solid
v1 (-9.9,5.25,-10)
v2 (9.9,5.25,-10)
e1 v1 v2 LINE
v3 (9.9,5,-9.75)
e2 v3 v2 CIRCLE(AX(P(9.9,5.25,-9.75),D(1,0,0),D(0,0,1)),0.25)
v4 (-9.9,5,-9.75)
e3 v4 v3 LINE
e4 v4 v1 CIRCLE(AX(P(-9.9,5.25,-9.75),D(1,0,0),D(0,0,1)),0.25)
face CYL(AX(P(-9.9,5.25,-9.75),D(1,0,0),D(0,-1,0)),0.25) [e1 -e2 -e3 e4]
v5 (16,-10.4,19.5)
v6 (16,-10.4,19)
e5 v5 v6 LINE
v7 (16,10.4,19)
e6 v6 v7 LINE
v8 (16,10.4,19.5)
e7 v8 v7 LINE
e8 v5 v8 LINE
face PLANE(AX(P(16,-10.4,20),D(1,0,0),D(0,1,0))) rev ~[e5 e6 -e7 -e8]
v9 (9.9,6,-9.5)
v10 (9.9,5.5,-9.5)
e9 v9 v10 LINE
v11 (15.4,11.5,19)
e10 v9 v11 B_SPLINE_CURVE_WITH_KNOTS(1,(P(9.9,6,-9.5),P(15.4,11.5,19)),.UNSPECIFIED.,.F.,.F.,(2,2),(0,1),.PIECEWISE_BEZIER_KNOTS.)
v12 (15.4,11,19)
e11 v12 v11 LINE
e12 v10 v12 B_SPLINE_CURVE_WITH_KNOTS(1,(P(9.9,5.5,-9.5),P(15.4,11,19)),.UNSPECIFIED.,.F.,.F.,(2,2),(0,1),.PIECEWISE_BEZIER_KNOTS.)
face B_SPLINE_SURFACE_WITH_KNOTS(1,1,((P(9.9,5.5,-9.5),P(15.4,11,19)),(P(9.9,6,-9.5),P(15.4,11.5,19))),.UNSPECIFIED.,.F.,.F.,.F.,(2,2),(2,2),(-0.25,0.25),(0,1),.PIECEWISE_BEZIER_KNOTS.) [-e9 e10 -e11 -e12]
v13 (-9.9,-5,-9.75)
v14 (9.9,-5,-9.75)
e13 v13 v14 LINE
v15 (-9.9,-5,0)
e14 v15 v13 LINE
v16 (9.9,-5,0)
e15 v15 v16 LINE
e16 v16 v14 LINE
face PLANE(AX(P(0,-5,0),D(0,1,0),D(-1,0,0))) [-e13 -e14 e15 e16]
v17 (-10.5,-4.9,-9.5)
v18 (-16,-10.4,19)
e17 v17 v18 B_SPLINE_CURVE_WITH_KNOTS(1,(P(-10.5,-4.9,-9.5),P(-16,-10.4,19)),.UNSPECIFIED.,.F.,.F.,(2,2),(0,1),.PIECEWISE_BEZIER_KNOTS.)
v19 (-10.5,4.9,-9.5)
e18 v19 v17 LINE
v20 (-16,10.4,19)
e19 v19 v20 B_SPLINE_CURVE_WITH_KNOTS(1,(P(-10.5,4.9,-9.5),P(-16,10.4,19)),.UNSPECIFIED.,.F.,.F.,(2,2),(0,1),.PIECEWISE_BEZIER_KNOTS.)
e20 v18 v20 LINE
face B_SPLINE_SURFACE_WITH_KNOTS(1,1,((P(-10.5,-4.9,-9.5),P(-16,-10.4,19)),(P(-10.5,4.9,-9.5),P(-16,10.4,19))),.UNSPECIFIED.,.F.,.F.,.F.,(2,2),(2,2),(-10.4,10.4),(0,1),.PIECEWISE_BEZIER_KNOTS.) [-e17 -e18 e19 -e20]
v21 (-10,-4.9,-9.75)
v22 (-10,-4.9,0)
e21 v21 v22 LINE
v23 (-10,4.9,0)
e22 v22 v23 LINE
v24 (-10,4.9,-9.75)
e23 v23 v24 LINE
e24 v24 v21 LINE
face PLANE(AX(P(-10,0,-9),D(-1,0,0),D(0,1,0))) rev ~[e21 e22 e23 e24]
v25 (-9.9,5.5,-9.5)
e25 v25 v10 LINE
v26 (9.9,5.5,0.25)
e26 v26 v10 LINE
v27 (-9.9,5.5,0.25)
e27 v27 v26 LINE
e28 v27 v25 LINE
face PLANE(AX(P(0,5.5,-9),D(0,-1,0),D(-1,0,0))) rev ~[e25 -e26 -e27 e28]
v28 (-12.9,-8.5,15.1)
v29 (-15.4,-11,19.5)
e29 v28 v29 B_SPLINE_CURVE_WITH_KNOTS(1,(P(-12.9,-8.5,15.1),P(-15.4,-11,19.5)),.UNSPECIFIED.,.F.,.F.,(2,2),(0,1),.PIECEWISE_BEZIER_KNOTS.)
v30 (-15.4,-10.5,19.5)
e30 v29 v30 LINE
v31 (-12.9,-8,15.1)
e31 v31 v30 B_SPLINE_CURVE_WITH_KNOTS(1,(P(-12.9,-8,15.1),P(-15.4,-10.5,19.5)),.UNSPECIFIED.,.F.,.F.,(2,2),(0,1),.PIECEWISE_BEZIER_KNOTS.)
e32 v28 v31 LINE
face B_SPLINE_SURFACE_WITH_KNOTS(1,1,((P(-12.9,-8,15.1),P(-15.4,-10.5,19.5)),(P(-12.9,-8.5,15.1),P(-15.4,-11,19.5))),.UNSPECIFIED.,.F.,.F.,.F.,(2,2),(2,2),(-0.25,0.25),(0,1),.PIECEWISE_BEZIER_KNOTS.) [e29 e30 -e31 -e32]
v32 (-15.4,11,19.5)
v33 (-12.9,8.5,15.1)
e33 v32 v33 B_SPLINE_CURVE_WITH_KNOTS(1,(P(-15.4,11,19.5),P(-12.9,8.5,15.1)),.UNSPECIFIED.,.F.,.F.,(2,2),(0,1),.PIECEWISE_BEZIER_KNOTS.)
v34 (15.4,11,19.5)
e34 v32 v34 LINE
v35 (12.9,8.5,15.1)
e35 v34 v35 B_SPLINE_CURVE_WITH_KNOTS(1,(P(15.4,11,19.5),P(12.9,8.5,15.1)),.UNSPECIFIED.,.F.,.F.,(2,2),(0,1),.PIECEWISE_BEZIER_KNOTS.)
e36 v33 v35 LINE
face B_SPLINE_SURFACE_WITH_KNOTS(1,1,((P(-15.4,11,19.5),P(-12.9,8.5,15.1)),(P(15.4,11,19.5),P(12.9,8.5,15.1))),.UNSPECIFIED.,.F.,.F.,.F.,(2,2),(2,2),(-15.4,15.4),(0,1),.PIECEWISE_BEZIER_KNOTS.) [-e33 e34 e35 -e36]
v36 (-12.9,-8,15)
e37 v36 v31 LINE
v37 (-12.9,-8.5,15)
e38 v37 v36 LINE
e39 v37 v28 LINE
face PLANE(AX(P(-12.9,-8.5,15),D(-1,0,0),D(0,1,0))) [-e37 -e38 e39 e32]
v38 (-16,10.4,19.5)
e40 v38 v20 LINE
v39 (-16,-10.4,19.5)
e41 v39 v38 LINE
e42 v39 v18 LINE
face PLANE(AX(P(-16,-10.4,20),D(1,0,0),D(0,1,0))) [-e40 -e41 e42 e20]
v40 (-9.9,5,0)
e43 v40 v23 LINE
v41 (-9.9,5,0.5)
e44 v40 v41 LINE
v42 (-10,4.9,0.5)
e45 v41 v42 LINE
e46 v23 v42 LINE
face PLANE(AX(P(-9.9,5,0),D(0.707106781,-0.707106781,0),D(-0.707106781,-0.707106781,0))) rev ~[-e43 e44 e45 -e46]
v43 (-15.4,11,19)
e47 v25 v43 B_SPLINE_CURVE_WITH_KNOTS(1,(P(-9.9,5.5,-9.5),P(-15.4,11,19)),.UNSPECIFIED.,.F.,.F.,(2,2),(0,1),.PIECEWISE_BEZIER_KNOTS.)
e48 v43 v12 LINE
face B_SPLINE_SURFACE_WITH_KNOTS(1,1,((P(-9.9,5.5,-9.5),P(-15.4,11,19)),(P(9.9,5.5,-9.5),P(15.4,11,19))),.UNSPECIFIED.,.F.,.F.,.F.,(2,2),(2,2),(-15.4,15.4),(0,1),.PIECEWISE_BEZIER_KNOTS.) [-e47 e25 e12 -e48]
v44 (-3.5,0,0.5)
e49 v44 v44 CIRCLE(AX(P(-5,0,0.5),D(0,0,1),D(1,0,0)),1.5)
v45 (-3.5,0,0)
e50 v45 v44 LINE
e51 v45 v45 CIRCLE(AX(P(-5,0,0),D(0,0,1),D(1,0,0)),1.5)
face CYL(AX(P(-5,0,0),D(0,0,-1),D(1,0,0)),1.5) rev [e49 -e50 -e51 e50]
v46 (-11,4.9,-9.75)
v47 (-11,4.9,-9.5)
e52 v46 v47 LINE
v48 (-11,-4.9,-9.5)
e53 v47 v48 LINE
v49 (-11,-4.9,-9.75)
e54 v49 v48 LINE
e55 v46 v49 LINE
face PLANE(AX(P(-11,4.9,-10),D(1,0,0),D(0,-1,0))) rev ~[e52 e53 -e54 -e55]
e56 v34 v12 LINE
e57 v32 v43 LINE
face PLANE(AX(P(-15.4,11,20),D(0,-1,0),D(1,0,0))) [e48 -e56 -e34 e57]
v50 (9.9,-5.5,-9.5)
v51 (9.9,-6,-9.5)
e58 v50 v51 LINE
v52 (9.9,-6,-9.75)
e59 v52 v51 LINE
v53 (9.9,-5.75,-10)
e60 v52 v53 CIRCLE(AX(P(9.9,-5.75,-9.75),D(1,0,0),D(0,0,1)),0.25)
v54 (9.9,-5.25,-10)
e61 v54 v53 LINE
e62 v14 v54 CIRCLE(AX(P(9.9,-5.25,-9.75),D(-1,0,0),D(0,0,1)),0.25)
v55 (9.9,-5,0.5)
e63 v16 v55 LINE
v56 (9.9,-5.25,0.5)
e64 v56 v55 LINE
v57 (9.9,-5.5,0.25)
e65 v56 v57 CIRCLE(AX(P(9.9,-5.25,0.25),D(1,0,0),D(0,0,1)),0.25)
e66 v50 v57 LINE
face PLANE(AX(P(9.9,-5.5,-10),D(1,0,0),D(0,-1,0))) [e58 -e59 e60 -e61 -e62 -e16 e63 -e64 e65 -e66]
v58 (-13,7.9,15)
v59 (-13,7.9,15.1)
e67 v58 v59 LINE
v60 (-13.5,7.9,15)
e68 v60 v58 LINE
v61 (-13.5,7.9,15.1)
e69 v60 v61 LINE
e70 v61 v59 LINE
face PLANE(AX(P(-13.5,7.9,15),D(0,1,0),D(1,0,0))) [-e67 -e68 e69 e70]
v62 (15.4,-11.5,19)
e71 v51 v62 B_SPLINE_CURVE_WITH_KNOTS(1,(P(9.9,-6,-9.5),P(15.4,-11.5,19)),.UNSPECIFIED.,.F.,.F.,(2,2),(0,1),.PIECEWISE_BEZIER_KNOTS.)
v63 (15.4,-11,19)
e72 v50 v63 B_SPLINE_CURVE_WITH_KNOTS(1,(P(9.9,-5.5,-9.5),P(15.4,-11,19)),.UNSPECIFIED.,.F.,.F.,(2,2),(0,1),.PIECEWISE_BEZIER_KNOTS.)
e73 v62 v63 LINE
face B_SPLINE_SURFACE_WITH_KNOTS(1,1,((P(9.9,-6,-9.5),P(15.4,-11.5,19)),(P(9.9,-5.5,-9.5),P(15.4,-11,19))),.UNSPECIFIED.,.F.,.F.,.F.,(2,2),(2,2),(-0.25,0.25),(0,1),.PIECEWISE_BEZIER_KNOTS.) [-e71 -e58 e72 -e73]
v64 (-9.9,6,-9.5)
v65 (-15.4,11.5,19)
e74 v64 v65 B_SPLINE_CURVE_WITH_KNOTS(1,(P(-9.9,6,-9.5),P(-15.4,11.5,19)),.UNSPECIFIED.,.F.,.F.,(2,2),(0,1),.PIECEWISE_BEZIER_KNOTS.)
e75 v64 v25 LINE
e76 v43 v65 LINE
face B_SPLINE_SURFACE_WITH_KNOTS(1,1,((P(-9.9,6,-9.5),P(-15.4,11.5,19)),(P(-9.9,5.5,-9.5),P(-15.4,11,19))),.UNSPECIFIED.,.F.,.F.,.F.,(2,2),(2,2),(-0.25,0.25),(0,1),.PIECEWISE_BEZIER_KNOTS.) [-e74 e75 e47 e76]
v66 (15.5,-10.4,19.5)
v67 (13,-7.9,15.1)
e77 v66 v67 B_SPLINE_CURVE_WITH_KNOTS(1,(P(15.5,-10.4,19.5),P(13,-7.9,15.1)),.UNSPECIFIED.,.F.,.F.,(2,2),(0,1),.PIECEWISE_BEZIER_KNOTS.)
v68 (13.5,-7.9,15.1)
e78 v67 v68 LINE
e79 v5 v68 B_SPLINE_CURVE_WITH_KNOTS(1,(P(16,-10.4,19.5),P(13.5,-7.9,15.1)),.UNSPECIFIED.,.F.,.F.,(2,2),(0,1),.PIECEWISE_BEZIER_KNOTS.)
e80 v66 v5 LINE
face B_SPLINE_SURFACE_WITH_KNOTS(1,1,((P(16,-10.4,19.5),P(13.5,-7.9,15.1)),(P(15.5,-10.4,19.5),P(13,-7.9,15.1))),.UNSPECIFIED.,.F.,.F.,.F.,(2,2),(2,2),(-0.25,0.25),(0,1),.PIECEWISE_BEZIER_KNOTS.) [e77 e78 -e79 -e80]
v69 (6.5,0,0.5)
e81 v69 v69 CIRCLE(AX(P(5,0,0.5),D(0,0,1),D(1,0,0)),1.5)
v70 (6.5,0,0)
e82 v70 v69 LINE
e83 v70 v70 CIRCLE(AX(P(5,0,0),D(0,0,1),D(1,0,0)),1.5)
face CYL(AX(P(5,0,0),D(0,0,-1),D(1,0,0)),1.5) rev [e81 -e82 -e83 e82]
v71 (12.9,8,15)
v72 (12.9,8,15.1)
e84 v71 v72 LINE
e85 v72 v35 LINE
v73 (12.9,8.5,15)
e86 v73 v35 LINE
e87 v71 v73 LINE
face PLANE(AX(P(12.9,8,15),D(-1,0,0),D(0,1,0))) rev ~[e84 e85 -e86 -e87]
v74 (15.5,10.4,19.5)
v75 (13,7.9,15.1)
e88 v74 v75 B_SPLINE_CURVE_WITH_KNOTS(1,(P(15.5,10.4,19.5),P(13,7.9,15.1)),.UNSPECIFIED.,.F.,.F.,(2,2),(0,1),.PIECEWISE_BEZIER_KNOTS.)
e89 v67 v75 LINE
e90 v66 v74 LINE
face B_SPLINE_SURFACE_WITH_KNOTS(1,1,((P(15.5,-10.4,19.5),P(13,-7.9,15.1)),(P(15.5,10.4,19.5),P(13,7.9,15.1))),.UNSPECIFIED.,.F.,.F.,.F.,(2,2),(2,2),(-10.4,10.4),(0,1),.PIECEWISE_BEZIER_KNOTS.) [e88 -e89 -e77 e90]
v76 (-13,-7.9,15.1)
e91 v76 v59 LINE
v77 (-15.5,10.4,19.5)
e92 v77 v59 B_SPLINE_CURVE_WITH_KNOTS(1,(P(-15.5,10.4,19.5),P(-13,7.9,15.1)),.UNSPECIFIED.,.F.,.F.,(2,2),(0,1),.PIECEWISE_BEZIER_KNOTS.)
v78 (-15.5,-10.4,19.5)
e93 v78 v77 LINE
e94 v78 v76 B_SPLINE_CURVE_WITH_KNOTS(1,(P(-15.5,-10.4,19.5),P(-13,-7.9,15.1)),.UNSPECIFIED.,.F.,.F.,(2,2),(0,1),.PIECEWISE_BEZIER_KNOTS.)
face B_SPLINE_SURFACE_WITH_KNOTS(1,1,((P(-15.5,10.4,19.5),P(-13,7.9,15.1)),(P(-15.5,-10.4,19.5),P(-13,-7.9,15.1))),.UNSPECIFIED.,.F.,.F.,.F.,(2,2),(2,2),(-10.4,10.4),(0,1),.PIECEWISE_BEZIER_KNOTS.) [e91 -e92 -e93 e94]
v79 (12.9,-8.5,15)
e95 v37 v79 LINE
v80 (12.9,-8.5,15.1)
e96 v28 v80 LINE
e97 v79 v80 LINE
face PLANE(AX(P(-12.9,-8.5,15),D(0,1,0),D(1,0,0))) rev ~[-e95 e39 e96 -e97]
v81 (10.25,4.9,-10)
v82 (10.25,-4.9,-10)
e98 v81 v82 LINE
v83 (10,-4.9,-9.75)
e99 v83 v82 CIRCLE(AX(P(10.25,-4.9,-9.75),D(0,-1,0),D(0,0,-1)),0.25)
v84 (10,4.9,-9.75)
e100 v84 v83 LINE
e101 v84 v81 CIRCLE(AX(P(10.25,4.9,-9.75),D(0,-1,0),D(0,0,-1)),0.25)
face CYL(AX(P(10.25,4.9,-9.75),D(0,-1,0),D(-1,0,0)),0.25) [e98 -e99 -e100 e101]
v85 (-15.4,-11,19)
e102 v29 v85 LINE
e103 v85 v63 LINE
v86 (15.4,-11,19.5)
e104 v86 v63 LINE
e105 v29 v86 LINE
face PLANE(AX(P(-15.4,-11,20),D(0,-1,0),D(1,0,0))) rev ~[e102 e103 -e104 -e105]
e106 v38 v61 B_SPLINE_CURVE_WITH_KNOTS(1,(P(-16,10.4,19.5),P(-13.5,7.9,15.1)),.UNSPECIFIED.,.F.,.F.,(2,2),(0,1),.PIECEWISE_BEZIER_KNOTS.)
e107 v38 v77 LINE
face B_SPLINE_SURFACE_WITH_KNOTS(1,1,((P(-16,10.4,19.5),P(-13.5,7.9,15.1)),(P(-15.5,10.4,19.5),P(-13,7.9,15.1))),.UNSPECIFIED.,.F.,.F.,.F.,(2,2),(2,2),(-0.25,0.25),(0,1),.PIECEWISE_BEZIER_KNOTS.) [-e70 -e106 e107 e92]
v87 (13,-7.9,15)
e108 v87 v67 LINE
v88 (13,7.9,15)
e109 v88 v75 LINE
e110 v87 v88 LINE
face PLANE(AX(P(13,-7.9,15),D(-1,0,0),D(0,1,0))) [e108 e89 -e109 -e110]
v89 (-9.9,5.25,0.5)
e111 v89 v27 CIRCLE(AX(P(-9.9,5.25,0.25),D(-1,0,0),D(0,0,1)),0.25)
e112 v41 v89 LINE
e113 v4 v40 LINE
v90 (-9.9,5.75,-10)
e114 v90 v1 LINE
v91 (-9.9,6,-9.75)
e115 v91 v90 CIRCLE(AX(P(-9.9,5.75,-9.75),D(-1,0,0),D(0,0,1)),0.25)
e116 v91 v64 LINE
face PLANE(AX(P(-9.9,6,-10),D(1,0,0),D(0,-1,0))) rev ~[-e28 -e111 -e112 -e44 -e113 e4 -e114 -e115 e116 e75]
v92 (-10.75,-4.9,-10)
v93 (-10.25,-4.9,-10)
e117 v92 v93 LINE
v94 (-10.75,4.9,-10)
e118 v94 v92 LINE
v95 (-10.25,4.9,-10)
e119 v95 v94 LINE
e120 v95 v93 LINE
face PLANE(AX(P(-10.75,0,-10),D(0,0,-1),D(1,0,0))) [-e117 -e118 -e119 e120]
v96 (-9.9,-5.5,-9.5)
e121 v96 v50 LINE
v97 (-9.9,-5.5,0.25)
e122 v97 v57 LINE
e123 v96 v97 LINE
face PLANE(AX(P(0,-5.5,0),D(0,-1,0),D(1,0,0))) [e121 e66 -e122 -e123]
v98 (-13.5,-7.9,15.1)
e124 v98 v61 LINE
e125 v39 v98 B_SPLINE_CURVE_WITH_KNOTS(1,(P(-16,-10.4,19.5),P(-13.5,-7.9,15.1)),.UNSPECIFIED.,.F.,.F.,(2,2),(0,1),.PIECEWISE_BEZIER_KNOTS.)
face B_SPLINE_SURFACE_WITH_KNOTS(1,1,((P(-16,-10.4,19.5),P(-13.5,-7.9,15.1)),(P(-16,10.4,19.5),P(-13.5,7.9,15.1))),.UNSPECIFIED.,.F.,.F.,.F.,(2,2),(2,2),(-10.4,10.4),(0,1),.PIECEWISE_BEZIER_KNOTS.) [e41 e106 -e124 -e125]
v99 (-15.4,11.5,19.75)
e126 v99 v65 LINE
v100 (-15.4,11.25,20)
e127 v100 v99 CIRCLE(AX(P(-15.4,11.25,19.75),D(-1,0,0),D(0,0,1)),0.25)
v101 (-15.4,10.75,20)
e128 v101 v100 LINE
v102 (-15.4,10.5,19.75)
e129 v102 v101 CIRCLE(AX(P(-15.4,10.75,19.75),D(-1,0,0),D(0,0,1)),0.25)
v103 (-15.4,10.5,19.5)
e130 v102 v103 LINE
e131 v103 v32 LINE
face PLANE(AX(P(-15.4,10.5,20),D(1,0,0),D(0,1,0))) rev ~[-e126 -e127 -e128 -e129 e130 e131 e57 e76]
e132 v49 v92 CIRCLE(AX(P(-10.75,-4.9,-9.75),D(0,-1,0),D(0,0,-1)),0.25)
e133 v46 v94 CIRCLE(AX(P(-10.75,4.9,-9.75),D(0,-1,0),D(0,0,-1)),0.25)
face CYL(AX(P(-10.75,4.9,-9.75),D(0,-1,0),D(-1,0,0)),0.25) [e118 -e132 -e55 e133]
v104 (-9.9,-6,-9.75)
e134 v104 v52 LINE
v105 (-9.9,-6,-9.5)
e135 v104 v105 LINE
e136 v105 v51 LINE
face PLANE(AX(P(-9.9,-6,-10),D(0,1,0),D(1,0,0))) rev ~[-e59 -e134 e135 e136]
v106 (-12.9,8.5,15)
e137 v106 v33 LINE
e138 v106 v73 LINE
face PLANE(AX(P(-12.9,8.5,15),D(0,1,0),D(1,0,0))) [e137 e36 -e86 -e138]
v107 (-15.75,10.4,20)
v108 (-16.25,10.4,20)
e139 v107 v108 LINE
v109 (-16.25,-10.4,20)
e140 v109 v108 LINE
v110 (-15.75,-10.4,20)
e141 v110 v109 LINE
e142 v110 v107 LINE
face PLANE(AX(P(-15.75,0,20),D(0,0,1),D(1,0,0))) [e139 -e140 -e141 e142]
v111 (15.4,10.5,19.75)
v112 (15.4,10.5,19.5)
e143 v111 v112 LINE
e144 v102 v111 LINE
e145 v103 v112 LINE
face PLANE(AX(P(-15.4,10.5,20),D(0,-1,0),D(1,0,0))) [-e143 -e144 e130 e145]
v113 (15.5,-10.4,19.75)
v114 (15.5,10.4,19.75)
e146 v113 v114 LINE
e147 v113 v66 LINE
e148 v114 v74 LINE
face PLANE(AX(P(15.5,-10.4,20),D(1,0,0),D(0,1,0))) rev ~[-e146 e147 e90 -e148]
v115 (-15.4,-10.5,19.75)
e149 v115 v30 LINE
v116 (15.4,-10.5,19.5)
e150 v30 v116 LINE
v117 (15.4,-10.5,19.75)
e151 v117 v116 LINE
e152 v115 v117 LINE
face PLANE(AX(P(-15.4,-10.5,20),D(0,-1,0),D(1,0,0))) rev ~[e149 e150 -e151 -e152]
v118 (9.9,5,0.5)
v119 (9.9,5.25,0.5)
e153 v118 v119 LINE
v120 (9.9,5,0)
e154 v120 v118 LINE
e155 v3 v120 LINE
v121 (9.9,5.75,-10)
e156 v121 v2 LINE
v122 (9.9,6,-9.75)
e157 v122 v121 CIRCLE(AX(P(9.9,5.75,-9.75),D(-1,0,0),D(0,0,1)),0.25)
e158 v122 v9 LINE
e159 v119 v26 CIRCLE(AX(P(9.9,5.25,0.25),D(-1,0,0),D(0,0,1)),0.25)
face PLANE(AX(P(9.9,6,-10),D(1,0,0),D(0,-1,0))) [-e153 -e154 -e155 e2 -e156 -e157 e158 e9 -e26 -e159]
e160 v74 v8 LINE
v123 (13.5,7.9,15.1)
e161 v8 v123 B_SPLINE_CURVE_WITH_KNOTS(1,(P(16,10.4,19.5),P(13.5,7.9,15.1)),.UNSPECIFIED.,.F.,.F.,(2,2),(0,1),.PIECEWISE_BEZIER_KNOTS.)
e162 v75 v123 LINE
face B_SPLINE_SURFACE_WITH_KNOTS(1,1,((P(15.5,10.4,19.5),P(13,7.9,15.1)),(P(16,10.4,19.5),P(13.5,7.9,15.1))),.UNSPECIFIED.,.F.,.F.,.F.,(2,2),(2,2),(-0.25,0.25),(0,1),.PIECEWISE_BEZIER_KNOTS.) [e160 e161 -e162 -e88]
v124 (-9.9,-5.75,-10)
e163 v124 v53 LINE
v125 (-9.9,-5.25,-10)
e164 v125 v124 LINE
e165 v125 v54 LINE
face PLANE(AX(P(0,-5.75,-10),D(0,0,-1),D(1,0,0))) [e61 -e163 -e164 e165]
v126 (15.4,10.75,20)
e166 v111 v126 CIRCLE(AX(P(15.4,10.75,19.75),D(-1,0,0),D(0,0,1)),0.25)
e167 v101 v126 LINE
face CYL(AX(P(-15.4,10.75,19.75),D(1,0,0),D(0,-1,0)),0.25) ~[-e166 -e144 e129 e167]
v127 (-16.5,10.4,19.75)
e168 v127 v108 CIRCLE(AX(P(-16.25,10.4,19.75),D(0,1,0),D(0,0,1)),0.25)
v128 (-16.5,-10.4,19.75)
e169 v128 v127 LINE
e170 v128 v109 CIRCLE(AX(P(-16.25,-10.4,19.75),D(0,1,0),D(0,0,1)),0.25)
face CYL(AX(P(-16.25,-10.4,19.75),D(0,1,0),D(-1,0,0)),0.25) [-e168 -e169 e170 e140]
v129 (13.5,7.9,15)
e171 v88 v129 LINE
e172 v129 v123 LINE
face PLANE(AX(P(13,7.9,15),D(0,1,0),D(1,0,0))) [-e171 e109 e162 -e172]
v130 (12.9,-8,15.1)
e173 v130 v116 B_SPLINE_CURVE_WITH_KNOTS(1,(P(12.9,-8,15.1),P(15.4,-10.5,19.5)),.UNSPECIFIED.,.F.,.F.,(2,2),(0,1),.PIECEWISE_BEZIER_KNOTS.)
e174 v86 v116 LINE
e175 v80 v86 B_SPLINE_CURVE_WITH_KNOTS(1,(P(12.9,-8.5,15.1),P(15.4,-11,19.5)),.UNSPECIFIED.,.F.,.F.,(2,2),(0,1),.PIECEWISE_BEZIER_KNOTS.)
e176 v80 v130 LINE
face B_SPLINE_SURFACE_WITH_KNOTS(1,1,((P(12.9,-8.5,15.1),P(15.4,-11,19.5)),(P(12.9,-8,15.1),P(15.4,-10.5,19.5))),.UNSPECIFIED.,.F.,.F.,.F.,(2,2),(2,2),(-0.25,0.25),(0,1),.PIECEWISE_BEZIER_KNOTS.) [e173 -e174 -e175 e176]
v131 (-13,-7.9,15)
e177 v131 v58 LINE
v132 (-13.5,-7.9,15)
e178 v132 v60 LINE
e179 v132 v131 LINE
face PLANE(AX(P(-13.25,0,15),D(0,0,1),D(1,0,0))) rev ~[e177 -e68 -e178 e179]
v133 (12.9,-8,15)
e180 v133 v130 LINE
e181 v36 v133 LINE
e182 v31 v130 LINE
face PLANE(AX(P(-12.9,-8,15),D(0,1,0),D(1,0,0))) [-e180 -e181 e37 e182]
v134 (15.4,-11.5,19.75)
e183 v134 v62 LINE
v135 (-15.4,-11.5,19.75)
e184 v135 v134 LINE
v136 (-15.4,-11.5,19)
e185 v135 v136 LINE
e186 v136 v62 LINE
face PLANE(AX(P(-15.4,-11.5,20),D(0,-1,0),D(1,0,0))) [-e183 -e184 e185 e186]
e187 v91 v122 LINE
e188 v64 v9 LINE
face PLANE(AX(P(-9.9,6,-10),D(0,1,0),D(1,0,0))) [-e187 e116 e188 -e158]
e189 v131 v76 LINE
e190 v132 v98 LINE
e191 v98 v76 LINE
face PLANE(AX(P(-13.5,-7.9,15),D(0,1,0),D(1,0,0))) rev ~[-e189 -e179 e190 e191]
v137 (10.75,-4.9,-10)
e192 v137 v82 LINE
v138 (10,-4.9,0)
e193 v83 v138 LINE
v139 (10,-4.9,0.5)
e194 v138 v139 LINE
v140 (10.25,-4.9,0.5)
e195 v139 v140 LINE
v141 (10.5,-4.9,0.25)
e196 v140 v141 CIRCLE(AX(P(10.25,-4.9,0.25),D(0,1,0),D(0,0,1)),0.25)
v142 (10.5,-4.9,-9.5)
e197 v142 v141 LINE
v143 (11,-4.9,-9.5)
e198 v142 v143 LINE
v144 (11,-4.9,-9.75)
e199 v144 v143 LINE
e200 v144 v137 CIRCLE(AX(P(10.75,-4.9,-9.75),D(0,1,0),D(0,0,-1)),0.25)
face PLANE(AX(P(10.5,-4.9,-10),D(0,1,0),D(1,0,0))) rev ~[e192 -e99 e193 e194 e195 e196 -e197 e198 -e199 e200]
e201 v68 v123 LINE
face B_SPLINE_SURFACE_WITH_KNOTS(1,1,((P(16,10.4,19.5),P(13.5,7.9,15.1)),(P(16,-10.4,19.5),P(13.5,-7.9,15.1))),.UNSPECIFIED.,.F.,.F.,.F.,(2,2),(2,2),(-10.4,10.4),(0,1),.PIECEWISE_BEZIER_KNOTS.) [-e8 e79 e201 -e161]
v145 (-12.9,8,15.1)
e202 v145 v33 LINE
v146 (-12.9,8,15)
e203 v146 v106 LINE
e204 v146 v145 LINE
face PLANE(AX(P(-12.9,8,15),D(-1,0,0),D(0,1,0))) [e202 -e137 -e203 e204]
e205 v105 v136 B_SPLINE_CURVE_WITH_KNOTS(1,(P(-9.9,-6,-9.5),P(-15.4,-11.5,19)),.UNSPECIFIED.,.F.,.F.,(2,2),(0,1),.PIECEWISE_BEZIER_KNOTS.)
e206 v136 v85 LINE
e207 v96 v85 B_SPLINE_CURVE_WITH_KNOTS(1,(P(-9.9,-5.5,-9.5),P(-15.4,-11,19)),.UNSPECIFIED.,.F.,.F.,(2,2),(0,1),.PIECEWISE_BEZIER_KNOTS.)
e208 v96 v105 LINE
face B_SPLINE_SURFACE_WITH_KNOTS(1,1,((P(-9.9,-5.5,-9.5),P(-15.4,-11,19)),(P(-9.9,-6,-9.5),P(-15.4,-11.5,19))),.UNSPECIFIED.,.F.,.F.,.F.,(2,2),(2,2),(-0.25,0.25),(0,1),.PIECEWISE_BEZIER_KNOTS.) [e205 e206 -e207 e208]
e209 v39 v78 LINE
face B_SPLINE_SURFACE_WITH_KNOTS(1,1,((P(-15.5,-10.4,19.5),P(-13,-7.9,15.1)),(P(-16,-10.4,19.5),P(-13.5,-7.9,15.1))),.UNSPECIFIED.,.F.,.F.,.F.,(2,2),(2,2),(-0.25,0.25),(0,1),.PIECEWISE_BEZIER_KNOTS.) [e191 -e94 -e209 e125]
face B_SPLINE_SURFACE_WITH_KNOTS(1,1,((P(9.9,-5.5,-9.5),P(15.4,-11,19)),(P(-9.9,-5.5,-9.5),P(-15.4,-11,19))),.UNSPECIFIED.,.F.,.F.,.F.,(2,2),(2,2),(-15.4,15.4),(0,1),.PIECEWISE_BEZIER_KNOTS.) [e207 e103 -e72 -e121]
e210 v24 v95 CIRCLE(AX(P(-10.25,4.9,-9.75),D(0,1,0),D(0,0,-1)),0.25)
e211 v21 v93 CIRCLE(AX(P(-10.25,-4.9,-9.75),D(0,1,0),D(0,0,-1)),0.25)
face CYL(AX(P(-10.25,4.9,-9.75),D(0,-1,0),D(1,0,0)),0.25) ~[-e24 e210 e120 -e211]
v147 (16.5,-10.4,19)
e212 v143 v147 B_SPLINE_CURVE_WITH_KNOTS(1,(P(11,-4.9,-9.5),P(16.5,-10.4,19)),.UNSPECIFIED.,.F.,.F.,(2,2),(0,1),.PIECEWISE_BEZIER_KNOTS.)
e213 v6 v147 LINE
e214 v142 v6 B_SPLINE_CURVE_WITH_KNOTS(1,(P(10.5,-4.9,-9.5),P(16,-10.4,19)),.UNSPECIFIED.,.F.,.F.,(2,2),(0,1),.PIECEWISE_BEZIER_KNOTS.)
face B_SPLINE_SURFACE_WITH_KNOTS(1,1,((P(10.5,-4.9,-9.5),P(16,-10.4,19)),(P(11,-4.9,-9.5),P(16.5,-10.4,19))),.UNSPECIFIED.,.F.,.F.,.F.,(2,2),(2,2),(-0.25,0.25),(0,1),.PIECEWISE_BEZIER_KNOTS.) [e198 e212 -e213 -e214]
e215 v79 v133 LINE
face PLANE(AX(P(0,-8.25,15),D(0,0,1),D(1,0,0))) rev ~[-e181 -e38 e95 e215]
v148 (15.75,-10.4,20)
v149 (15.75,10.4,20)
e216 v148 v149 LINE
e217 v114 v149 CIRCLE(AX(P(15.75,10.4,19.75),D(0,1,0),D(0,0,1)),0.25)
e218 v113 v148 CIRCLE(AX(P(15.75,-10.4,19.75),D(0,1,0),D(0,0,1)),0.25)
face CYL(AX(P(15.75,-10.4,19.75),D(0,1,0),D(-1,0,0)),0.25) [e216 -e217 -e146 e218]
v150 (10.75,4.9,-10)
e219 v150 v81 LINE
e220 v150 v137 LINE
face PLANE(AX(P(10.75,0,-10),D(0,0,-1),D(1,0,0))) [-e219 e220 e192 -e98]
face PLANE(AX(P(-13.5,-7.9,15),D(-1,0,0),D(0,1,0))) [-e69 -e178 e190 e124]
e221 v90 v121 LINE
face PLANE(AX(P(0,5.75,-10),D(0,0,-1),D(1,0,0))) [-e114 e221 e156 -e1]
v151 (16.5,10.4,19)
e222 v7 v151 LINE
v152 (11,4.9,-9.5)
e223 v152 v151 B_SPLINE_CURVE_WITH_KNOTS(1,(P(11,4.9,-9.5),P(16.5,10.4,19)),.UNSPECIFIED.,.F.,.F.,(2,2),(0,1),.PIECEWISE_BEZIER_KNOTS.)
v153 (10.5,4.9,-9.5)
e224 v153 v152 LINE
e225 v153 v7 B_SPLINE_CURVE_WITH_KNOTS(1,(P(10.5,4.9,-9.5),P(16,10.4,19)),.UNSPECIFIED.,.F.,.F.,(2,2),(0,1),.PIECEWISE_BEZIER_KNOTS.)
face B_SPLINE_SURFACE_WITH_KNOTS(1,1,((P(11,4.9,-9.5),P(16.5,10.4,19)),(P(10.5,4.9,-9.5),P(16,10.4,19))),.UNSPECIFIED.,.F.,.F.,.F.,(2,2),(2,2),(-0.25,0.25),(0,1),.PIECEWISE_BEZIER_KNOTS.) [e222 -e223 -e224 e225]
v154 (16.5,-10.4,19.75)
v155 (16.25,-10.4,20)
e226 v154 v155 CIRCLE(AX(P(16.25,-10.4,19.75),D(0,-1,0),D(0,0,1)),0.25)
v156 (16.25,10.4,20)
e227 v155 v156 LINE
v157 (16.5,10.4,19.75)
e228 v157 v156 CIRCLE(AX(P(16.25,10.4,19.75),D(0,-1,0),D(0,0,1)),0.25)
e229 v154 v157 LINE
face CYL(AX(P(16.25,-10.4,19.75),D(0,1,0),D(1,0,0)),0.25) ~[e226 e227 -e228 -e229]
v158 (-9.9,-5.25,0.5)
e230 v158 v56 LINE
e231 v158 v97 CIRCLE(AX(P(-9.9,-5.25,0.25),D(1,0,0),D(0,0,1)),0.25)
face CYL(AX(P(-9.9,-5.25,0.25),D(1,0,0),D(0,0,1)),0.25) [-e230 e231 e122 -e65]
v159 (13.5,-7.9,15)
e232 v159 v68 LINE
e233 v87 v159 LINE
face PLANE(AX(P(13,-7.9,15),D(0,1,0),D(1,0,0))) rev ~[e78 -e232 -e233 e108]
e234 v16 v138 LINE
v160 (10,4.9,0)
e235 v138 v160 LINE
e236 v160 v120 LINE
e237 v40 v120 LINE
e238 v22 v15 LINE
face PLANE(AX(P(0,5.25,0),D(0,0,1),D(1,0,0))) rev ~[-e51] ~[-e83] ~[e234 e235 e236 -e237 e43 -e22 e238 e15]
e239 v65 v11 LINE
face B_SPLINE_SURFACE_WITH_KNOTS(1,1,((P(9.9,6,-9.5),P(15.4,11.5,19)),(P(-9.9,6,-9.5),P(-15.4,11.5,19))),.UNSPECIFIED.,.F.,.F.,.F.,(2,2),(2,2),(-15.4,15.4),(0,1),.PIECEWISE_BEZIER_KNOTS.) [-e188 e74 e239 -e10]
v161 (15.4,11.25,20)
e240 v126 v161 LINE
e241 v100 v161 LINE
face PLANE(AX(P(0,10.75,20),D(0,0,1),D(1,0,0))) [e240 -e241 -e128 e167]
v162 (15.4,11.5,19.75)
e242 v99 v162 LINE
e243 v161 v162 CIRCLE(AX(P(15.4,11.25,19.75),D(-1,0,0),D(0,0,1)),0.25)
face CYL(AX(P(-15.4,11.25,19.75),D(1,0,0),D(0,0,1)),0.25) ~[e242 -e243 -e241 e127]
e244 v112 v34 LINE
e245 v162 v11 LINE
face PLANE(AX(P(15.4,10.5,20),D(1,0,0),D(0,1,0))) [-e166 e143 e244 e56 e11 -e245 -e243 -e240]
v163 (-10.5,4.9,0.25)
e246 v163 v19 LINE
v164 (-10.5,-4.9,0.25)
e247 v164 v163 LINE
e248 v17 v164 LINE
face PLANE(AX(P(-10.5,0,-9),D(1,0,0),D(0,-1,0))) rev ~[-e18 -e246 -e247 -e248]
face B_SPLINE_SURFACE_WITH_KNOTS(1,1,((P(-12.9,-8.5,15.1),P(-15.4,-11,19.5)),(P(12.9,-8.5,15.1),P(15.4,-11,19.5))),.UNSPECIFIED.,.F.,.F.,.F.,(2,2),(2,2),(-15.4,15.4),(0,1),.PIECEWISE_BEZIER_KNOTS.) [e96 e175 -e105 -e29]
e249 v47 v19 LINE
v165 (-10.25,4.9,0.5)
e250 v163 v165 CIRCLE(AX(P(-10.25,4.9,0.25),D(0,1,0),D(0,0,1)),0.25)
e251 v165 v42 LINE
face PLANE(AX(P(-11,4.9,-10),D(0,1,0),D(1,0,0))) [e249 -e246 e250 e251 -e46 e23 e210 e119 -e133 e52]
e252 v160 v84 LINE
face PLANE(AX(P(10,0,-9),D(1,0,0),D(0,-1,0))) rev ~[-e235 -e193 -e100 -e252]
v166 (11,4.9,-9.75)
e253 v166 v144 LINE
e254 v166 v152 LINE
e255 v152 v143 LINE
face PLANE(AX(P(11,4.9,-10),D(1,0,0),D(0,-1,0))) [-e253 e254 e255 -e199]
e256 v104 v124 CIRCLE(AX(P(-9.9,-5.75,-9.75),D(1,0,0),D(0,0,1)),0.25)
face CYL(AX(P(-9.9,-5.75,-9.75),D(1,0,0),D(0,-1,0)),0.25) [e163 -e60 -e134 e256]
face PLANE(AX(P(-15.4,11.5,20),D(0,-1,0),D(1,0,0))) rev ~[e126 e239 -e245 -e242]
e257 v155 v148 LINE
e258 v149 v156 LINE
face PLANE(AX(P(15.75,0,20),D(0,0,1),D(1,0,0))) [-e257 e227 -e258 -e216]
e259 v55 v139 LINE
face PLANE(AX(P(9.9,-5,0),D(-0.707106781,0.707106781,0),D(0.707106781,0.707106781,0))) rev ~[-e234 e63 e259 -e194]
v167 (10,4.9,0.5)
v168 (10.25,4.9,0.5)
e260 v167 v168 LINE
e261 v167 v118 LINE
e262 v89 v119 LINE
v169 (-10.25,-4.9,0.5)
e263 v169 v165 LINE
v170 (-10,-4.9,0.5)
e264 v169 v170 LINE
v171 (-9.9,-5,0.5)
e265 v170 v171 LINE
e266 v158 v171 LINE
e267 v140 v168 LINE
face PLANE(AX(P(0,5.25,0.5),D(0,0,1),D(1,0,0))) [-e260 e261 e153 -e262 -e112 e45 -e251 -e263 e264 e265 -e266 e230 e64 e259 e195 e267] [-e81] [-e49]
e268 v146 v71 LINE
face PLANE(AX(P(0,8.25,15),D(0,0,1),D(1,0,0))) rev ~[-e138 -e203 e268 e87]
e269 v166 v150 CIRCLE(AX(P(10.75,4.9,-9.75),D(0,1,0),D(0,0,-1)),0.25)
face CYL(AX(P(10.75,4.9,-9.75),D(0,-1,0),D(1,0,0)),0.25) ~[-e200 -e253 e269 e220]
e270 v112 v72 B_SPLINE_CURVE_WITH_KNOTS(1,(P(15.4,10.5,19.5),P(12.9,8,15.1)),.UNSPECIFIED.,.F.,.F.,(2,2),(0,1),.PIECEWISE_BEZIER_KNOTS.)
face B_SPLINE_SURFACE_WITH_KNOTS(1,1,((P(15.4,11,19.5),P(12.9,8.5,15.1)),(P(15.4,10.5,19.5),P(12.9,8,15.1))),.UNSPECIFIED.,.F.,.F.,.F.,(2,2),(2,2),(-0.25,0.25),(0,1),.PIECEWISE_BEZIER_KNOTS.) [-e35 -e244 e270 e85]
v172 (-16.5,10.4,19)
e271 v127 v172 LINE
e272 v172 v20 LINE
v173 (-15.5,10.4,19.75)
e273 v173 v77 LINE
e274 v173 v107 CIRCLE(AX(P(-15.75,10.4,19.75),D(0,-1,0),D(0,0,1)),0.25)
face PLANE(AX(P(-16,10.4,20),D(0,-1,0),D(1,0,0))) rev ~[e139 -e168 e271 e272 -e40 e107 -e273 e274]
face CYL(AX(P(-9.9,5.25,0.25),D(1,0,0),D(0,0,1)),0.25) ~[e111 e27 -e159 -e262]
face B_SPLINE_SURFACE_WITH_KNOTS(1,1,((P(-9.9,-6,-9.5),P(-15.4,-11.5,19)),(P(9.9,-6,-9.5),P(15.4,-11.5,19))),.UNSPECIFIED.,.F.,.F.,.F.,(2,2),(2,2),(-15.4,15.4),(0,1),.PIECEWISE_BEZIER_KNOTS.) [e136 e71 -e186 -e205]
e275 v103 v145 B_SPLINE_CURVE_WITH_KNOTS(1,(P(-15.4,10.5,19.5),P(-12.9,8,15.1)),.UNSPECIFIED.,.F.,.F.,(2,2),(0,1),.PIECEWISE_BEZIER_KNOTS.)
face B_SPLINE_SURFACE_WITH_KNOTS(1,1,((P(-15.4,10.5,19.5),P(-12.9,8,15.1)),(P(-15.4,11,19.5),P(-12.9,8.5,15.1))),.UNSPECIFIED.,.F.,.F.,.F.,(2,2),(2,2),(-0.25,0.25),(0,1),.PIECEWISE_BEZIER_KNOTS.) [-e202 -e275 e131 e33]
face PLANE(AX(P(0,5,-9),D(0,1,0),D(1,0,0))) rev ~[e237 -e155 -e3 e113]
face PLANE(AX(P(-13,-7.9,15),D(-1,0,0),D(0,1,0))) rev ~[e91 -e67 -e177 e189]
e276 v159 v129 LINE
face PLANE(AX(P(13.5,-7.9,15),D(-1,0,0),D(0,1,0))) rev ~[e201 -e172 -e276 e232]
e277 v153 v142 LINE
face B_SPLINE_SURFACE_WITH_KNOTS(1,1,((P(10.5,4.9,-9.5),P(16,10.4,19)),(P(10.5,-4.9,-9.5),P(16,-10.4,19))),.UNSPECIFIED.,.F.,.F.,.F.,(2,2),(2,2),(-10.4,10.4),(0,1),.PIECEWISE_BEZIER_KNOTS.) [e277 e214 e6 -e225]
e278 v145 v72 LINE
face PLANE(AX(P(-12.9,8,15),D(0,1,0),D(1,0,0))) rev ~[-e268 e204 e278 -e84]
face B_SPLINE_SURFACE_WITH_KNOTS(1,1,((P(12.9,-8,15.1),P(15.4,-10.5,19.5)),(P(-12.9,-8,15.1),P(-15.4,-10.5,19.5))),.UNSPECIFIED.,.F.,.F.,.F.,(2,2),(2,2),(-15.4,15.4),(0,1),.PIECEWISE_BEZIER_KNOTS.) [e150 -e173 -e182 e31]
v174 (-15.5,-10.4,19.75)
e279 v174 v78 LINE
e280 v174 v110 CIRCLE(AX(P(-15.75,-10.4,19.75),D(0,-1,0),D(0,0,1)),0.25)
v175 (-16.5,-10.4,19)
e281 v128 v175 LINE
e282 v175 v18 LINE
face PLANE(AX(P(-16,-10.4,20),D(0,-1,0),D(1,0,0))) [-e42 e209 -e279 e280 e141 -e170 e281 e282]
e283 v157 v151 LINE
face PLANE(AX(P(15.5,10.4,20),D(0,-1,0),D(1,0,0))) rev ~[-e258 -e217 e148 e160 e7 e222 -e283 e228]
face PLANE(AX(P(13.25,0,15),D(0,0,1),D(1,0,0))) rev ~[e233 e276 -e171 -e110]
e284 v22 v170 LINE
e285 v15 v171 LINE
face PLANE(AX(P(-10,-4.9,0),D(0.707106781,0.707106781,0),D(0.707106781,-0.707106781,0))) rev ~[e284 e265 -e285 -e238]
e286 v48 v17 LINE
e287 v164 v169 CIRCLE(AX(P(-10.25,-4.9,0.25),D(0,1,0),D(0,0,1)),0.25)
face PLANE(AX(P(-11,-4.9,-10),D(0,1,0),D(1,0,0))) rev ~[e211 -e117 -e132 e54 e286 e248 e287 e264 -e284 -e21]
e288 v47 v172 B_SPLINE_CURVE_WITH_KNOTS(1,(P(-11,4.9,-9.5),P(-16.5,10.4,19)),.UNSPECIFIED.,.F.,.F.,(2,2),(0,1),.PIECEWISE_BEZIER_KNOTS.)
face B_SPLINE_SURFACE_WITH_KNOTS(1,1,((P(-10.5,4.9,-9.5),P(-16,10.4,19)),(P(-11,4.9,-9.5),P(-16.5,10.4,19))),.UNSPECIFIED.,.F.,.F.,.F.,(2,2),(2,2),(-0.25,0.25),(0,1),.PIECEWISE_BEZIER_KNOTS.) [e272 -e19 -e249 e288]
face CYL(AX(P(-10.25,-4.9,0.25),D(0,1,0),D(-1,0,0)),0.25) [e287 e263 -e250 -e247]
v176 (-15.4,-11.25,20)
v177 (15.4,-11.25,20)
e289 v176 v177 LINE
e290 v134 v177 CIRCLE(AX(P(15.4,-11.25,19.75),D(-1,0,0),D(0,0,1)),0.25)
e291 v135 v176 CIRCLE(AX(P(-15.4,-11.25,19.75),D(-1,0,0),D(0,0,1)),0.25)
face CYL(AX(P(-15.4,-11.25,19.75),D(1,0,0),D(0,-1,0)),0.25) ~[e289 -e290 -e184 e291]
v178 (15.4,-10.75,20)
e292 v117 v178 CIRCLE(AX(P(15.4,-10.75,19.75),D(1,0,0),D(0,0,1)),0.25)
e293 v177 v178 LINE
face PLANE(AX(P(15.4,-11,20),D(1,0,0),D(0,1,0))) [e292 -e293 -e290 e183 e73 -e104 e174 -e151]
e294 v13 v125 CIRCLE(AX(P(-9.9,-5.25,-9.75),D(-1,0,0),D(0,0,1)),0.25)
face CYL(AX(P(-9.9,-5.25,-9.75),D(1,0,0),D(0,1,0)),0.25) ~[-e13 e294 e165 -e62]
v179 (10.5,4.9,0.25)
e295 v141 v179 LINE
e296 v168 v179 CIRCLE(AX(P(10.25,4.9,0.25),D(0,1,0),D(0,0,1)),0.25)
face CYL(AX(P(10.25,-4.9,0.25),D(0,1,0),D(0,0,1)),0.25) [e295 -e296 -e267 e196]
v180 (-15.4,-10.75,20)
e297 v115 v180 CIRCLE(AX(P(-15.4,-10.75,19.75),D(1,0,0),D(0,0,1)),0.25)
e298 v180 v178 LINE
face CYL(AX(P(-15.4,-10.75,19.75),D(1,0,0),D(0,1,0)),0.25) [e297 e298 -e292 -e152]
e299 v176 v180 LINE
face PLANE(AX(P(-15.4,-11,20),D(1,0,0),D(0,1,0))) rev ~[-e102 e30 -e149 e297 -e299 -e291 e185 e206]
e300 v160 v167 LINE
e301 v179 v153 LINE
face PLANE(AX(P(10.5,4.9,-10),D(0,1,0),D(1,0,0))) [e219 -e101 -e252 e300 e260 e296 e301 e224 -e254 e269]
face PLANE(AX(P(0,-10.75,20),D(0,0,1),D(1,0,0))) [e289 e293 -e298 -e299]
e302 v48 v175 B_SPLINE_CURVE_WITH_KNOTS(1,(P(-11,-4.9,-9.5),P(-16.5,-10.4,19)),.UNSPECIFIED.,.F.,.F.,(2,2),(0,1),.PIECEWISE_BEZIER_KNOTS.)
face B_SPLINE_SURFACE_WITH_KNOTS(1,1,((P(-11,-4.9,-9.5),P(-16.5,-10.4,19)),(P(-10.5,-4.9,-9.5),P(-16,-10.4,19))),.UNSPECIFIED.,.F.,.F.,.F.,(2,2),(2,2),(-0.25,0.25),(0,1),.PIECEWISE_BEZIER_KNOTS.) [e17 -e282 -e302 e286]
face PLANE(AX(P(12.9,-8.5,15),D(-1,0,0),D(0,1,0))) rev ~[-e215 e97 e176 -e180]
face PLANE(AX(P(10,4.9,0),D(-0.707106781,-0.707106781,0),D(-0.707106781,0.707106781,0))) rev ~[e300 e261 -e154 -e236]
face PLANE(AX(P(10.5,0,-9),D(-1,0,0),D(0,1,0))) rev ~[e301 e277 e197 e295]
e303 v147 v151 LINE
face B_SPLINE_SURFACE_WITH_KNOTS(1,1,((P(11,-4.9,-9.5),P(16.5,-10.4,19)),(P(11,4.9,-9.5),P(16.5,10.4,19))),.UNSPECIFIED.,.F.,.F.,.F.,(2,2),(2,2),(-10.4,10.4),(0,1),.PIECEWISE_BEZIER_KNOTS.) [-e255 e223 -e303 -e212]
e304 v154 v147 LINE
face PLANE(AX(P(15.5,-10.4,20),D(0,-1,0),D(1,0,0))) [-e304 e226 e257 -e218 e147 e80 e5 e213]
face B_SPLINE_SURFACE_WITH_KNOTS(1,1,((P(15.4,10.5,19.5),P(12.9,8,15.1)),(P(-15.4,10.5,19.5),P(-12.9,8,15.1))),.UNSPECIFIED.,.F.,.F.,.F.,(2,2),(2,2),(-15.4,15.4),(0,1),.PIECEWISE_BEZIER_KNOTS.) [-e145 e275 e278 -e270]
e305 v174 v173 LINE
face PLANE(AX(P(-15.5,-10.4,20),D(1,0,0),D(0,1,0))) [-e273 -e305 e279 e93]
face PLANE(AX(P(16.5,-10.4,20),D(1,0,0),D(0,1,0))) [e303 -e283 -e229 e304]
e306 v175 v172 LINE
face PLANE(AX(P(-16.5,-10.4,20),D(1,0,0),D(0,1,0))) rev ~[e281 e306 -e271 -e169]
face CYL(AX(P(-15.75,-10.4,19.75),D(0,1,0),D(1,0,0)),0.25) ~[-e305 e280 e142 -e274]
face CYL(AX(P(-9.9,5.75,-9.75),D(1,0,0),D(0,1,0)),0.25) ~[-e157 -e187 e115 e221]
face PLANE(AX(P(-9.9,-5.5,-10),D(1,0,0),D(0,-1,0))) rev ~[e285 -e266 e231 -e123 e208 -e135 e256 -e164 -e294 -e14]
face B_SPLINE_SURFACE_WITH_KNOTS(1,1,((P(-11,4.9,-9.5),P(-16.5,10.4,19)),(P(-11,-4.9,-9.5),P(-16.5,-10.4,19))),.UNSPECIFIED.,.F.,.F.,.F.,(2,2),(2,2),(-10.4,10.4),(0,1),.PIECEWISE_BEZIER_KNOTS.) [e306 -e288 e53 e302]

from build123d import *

# Parameters (mm, degrees)
F0_W         = 19.8
F0_H         = 0.5
F0_R         = 1.5
F0_W_2       = 0.5
F0_H_2       = 9.8
F1_DEPTH     = 0.5
F3_W         = 0.5
F3_H         = 9.8
F4_DEPTH     = 1
F3_W_2       = 19.8
F3_H_2       = 0.5
F5_DEPTH     = 0.5
F4_FACE_W    = 19.8
F4_FACE_H    = 0.5
F4_FACE_W_2  = 0.5
F4_FACE_H_2  = 9.8
F11_R        = 0.25
F11_2_R      = 0.25
F11_3_R      = 0.25
F11_4_R      = 0.25
F11_5_R      = 0.25
F2_W         = 30.8
F2_H         = 0.5
F12_DEPTH    = 1
F2_W_2       = 0.5
F2_H_2       = 20.8
F13_DEPTH    = 0.5
F5_FACE_W    = 0.5
F5_FACE_H    = 9.8
F12_FACE_W   = 0.5
F12_FACE_H   = 20.8
F5_FACE_W_2  = 19.8
F5_FACE_H_2  = 0.5
F12_FACE_W_2 = 30.8
F12_FACE_H_2 = 0.5
F19_W        = 0.5
F19_H        = 15.8
F20_DEPTH    = 0.1
F19_W_2      = 25.8
F19_H_2      = 0.5
F13_FACE_W   = 0.5
F13_FACE_H   = 20.8
F20_FACE_W   = 0.5
F20_FACE_H   = 15.8
F13_FACE_W_2 = 30.8
F13_FACE_H_2 = 0.5
F20_FACE_W_2 = 25.8
F20_FACE_H_2 = 0.5
F26_R        = 0.25
F27_R        = 0.25
F28_R        = 0.25


with BuildPart() as f1:
    # F0 (on Top) → F1 (new body)
    with BuildSketch(Plane.XY):
        with Locations((0, 5.25)):
            Rectangle(F0_W, F0_H)
        Polygon((9.9, 5), (-9.9, 5), (-10, 4.9), (-10, -4.9), (-9.9, -5), (9.9, -5), (10, -4.9), (10, 4.9), align=None)
        with Locations((-5, 0)):
            Circle(F0_R, mode=Mode.SUBTRACT)
        with Locations((5, 0)):
            Circle(F0_R, mode=Mode.SUBTRACT)
        with Locations((-10.25, 0)):
            Rectangle(F0_W_2, F0_H_2)
        with Locations((10.25, 0)):
            Rectangle(F0_W_2, F0_H_2)
        with Locations((0, -5.25)):
            Rectangle(F0_W, F0_H)
    extrude(amount=F1_DEPTH)



with BuildPart() as f4:
    # F3 (on face) → F4 (new body)
    with BuildSketch(Plane(origin=(0, 0, 0), x_dir=(1, 0, 0), z_dir=(0, 0, -1))):
        with Locations((10.25, 0)):
            Rectangle(F3_W, F3_H)
    extrude(amount=-F4_DEPTH)


with BuildPart() as f4b:
    # F3 (on face) → F4, piece 2 (new body)
    with BuildSketch(Plane(origin=(0, 0, 0), x_dir=(1, 0, 0), z_dir=(0, 0, -1))):
        with Locations((0, -5.25)):
            Rectangle(F3_W_2, F3_H_2)
    extrude(amount=-F4_DEPTH)


with BuildPart() as f4c:
    # F3 (on face) → F4, piece 3 (new body)
    with BuildSketch(Plane(origin=(0, 0, 0), x_dir=(1, 0, 0), z_dir=(0, 0, -1))):
        with Locations((0, 5.25)):
            Rectangle(F3_W_2, F3_H_2)
    extrude(amount=-F4_DEPTH)


with BuildPart() as f4d:
    # F3 (on face) → F4, piece 4 (new body)
    with BuildSketch(Plane(origin=(0, 0, 0), x_dir=(1, 0, 0), z_dir=(0, 0, -1))):
        with Locations((-10.25, 0)):
            Rectangle(F3_W, F3_H)
    extrude(amount=-F4_DEPTH)


with BuildPart() as f5:
    # F3 (on face) → F5 (new body)
    with BuildSketch(Plane(origin=(0, 0, 0), x_dir=(1, 0, 0), z_dir=(0, 0, -1))):
        with Locations((0, -5.75)):
            Rectangle(F3_W_2, F3_H_2)
    extrude(amount=-F5_DEPTH)


with BuildPart() as f5b:
    # F3 (on face) → F5, piece 2 (new body)
    with BuildSketch(Plane(origin=(0, 0, 0), x_dir=(1, 0, 0), z_dir=(0, 0, -1))):
        with Locations((0, 5.75)):
            Rectangle(F3_W_2, F3_H_2)
    extrude(amount=-F5_DEPTH)


with BuildPart() as f5c:
    # F3 (on face) → F5, piece 3 (new body)
    with BuildSketch(Plane(origin=(0, 0, 0), x_dir=(1, 0, 0), z_dir=(0, 0, -1))):
        with Locations((-10.75, 0)):
            Rectangle(F3_W, F3_H)
    extrude(amount=-F5_DEPTH)


with BuildPart() as f5d:
    # F3 (on face) → F5, piece 4 (new body)
    with BuildSketch(Plane(origin=(0, 0, 0), x_dir=(1, 0, 0), z_dir=(0, 0, -1))):
        with Locations((10.75, 0)):
            Rectangle(F3_W, F3_H)
    extrude(amount=-F5_DEPTH)


with BuildPart() as f4c_1:
    # F6: moved
    add(f4c.part.moved(Location((0, 0, -10))))


with BuildPart() as f5b_1:
    # F6: moved
    add(f5b.part.moved(Location((0, 0, -10))))

    # F11#3
    f11_3_edges = [f5b_1.edges().sort_by_distance(p)[0] for p in [
        (0, -6, -10),
    ]]
    fillet(f11_3_edges, radius=F11_3_R)


with BuildPart() as f5d_1:
    # F6: moved
    add(f5d.part.moved(Location((0, 0, -10))))

    # F11#5
    f11_5_edges = [f5d_1.edges().sort_by_distance(p)[0] for p in [
        (11, 0, -10),
    ]]
    fillet(f11_5_edges, radius=F11_5_R)


with BuildPart() as f4_1:
    # F6: moved
    add(f4.part.moved(Location((0, 0, -10))))


with BuildPart() as f5_1:
    # F6: moved
    add(f5.part.moved(Location((0, 0, -10))))

    # F11#2
    f11_2_edges = [f5_1.edges().sort_by_distance(p)[0] for p in [
        (0, 6, -10),
    ]]
    fillet(f11_2_edges, radius=F11_2_R)


with BuildPart() as f4b_1:
    # F6: moved
    add(f4b.part.moved(Location((0, 0, -10))))


with BuildPart() as f5c_1:
    # F6: moved
    add(f5c.part.moved(Location((0, 0, -10))))

    # F11#4
    f11_4_edges = [f5c_1.edges().sort_by_distance(p)[0] for p in [
        (-11, 0, -10),
    ]]
    fillet(f11_4_edges, radius=F11_4_R)


with BuildPart() as f4d_1:
    # F6: moved
    add(f4d.part.moved(Location((0, 0, -10))))


with BuildPart() as f1_1:
    add(f1.part)

    add(f4c_1.part)  # F7 merges F4c
    # F4_face (on face) → F7 section 0
    with BuildSketch(Plane(origin=(0, -5.25, -9), x_dir=(1, 0, 0), z_dir=(0, 0, 1))):
        Rectangle(F4_FACE_W, F4_FACE_H)
    # F0 (on Top) → F7 section 1
    with BuildSketch(Plane.XY):
        with Locations((0, -5.25)):
            Rectangle(F0_W, F0_H)
    loft()


    add(f4_1.part)  # F8 merges F4
    # F0 (on Top) → F8 section 0
    with BuildSketch(Plane.XY):
        with Locations((10.25, 0)):
            Rectangle(F0_W_2, F0_H_2)
    # F4_face (on face) → F8 section 1
    with BuildSketch(Plane(origin=(0, -5.25, -9), x_dir=(1, 0, 0), z_dir=(0, 0, 1))):
        with Locations((10.25, 5.25)):
            Rectangle(F4_FACE_W_2, F4_FACE_H_2)
    loft()


    add(f4b_1.part)  # F9 merges F4b
    # F0 (on Top) → F9 section 0
    with BuildSketch(Plane.XY):
        with Locations((0, 5.25)):
            Rectangle(F0_W, F0_H)
    # F4_face (on face) → F9 section 1
    with BuildSketch(Plane(origin=(0, -5.25, -9), x_dir=(1, 0, 0), z_dir=(0, 0, 1))):
        with Locations((0, 10.5)):
            Rectangle(F4_FACE_W, F4_FACE_H)
    loft()


    add(f4d_1.part)  # F10 merges F4d
    # F0 (on Top) → F10 section 0
    with BuildSketch(Plane.XY):
        with Locations((-10.25, 0)):
            Rectangle(F0_W_2, F0_H_2)
    # F4_face (on face) → F10 section 1
    with BuildSketch(Plane(origin=(0, -5.25, -9), x_dir=(1, 0, 0), z_dir=(0, 0, 1))):
        with Locations((-10.25, 5.25)):
            Rectangle(F4_FACE_W_2, F4_FACE_H_2)
    loft()

    # F11
    f11_edges = [f1_1.edges().sort_by_distance(p)[0] for p in [
        (10.5, 0, 0.5),
        (0, -5.5, 0.5),
        (0, 5.5, 0.5),
        (-10.5, 0, 0.5),
        (-10, 0, -10),
        (0, 5, -10),
        (10, 0, -10),
        (0, -5, -10),
    ]]
    fillet(f11_edges, radius=F11_R)


    add(f5c_1.part)  # F15 merges F5c


with BuildPart() as f12:
    # F2 (on Top) → F12 (new body)
    with BuildSketch(Plane.XY):
        with Locations((0, 11.25)):
            Rectangle(F2_W, F2_H)
    extrude(amount=-F12_DEPTH)


with BuildPart() as f12b:
    # F2 (on Top) → F12, piece 2 (new body)
    with BuildSketch(Plane.XY):
        with Locations((-16.25, 0)):
            Rectangle(F2_W_2, F2_H_2)
    extrude(amount=-F12_DEPTH)


with BuildPart() as f12c:
    # F2 (on Top) → F12, piece 3 (new body)
    with BuildSketch(Plane.XY):
        with Locations((0, -11.25)):
            Rectangle(F2_W, F2_H)
    extrude(amount=-F12_DEPTH)


with BuildPart() as f12d:
    # F2 (on Top) → F12, piece 4 (new body)
    with BuildSketch(Plane.XY):
        with Locations((16.25, 0)):
            Rectangle(F2_W_2, F2_H_2)
    extrude(amount=-F12_DEPTH)


with BuildPart() as f13:
    # F2 (on Top) → F13 (new body)
    with BuildSketch(Plane.XY):
        with Locations((-15.75, 0)):
            Rectangle(F2_W_2, F2_H_2)
    extrude(amount=-F13_DEPTH)


with BuildPart() as f13b:
    # F2 (on Top) → F13, piece 2 (new body)
    with BuildSketch(Plane.XY):
        with Locations((0, 10.75)):
            Rectangle(F2_W, F2_H)
    extrude(amount=-F13_DEPTH)


with BuildPart() as f13c:
    # F2 (on Top) → F13, piece 3 (new body)
    with BuildSketch(Plane.XY):
        with Locations((15.75, 0)):
            Rectangle(F2_W_2, F2_H_2)
    extrude(amount=-F13_DEPTH)


with BuildPart() as f13d:
    # F2 (on Top) → F13, piece 4 (new body)
    with BuildSketch(Plane.XY):
        with Locations((0, -10.75)):
            Rectangle(F2_W, F2_H)
    extrude(amount=-F13_DEPTH)


with BuildPart() as f13b_1:
    # F14: moved
    add(f13b.part.moved(Location((0, 0, 20))))


with BuildPart() as f12_1:
    # F14: moved
    add(f12.part.moved(Location((0, 0, 20))))


with BuildPart() as f12b_1:
    # F14: moved
    add(f12b.part.moved(Location((0, 0, 20))))


with BuildPart() as f13_1:
    # F14: moved
    add(f13.part.moved(Location((0, 0, 20))))


with BuildPart() as f13d_1:
    # F14: moved
    add(f13d.part.moved(Location((0, 0, 20))))


with BuildPart() as f12c_1:
    # F14: moved
    add(f12c.part.moved(Location((0, 0, 20))))


with BuildPart() as f13c_1:
    # F14: moved
    add(f13c.part.moved(Location((0, 0, 20))))


with BuildPart() as f12d_1:
    # F14: moved
    add(f12d.part.moved(Location((0, 0, 20))))


with BuildPart() as f1_2:
    add(f1_1.part)

    add(f12b_1.part)  # F15 merges F12b
    # F5_face (on face) → F15 section 0
    with BuildSketch(Plane(origin=(-10.75, 0, -9.5), x_dir=(1, 0, 0), z_dir=(0, 0, 1))):
        Rectangle(F5_FACE_W, F5_FACE_H)
    # F12_face (on face) → F15 section 1
    with BuildSketch(Plane(origin=(-16.25, 0, 19), x_dir=(1, 0, 0), z_dir=(0, 0, -1))):
        Rectangle(F12_FACE_W, F12_FACE_H)
    loft()


    add(f5b_1.part)  # F16 merges F5b

    add(f12c_1.part)  # F16 merges F12c
    # F5_face (on face) → F16 section 0
    with BuildSketch(Plane(origin=(-10.75, 0, -9.5), x_dir=(1, 0, 0), z_dir=(0, 0, 1))):
        with Locations((10.75, -5.75)):
            Rectangle(F5_FACE_W_2, F5_FACE_H_2)
    # F12_face (on face) → F16 section 1
    with BuildSketch(Plane(origin=(-16.25, 0, 19), x_dir=(1, 0, 0), z_dir=(0, 0, -1))):
        with Locations((16.25, 11.25)):
            Rectangle(F12_FACE_W_2, F12_FACE_H_2)
    loft()


    add(f5d_1.part)  # F17 merges F5d

    add(f12d_1.part)  # F17 merges F12d
    # F5_face (on face) → F17 section 0
    with BuildSketch(Plane(origin=(-10.75, 0, -9.5), x_dir=(1, 0, 0), z_dir=(0, 0, 1))):
        with Locations((21.5, 0)):
            Rectangle(F5_FACE_W, F5_FACE_H)
    # F12_face (on face) → F17 section 1
    with BuildSketch(Plane(origin=(-16.25, 0, 19), x_dir=(1, 0, 0), z_dir=(0, 0, -1))):
        with Locations((32.5, 0)):
            Rectangle(F12_FACE_W, F12_FACE_H)
    loft()


    add(f5_1.part)  # F18 merges F5

    add(f12_1.part)  # F18 merges F12
    # F5_face (on face) → F18 section 0
    with BuildSketch(Plane(origin=(-10.75, 0, -9.5), x_dir=(1, 0, 0), z_dir=(0, 0, 1))):
        with Locations((10.75, 5.75)):
            Rectangle(F5_FACE_W_2, F5_FACE_H_2)
    # F12_face (on face) → F18 section 1
    with BuildSketch(Plane(origin=(-16.25, 0, 19), x_dir=(1, 0, 0), z_dir=(0, 0, -1))):
        with Locations((16.25, -11.25)):
            Rectangle(F12_FACE_W_2, F12_FACE_H_2)
    loft()


    add(f13_1.part)  # F22 merges F13


with BuildPart() as f20:
    # F19 (on Top) → F20 (new body)
    with BuildSketch(Plane.XY):
        with Locations((-13.25, 0)):
            Rectangle(F19_W, F19_H)
    extrude(amount=F20_DEPTH)


with BuildPart() as f20b:
    # F19 (on Top) → F20, piece 2 (new body)
    with BuildSketch(Plane.XY):
        with Locations((0, -8.25)):
            Rectangle(F19_W_2, F19_H_2)
    extrude(amount=F20_DEPTH)


with BuildPart() as f20c:
    # F19 (on Top) → F20, piece 3 (new body)
    with BuildSketch(Plane.XY):
        with Locations((13.25, 0)):
            Rectangle(F19_W, F19_H)
    extrude(amount=F20_DEPTH)


with BuildPart() as f20d:
    # F19 (on Top) → F20, piece 4 (new body)
    with BuildSketch(Plane.XY):
        with Locations((0, 8.25)):
            Rectangle(F19_W_2, F19_H_2)
    extrude(amount=F20_DEPTH)


with BuildPart() as f20b_1:
    # F21: moved
    add(f20b.part.moved(Location((0, 0, 15))))


with BuildPart() as f20d_1:
    # F21: moved
    add(f20d.part.moved(Location((0, 0, 15))))


with BuildPart() as f20c_1:
    # F21: moved
    add(f20c.part.moved(Location((0, 0, 15))))


with BuildPart() as f20_1:
    # F21: moved
    add(f20.part.moved(Location((0, 0, 15))))


with BuildPart() as f1_3:
    add(f1_2.part)

    add(f20_1.part)  # F22 merges F20
    # F13_face (on face) → F22 section 0
    with BuildSketch(Plane(origin=(-15.75, 0, 19.5), x_dir=(1, 0, 0), z_dir=(0, 0, -1))):
        Rectangle(F13_FACE_W, F13_FACE_H)
    # F20_face (on face) → F22 section 1
    with BuildSketch(Plane(origin=(-13.25, 0, 15.1), x_dir=(1, 0, 0), z_dir=(0, 0, 1))):
        Rectangle(F20_FACE_W, F20_FACE_H)
    loft()


    add(f13b_1.part)  # F23 merges F13b

    add(f20d_1.part)  # F23 merges F20d
    # F13_face (on face) → F23 section 0
    with BuildSketch(Plane(origin=(-15.75, 0, 19.5), x_dir=(1, 0, 0), z_dir=(0, 0, -1))):
        with Locations((15.75, -10.75)):
            Rectangle(F13_FACE_W_2, F13_FACE_H_2)
    # F20_face (on face) → F23 section 1
    with BuildSketch(Plane(origin=(-13.25, 0, 15.1), x_dir=(1, 0, 0), z_dir=(0, 0, 1))):
        with Locations((13.25, 8.25)):
            Rectangle(F20_FACE_W_2, F20_FACE_H_2)
    loft()


    add(f13d_1.part)  # F24 merges F13d

    add(f20b_1.part)  # F24 merges F20b
    # F20_face (on face) → F24 section 0
    with BuildSketch(Plane(origin=(-13.25, 0, 15.1), x_dir=(1, 0, 0), z_dir=(0, 0, 1))):
        with Locations((13.25, -8.25)):
            Rectangle(F20_FACE_W_2, F20_FACE_H_2)
    # F13_face (on face) → F24 section 1
    with BuildSketch(Plane(origin=(-15.75, 0, 19.5), x_dir=(1, 0, 0), z_dir=(0, 0, -1))):
        with Locations((15.75, 10.75)):
            Rectangle(F13_FACE_W_2, F13_FACE_H_2)
    loft()


    add(f13c_1.part)  # F25 merges F13c

    add(f20c_1.part)  # F25 merges F20c
    # F13_face (on face) → F25 section 0
    with BuildSketch(Plane(origin=(-15.75, 0, 19.5), x_dir=(1, 0, 0), z_dir=(0, 0, -1))):
        with Locations((31.5, 0)):
            Rectangle(F13_FACE_W, F13_FACE_H)
    # F20_face (on face) → F25 section 1
    with BuildSketch(Plane(origin=(-13.25, 0, 15.1), x_dir=(1, 0, 0), z_dir=(0, 0, 1))):
        with Locations((26.5, 0)):
            Rectangle(F20_FACE_W, F20_FACE_H)
    loft()

    # F26
    f26_edges = [f1_3.edges().sort_by_distance(p)[0] for p in [
        (-15.5, 0, 20),
    ]]
    fillet(f26_edges, radius=F26_R)

    # F27
    f27_edges = [f1_3.edges().sort_by_distance(p)[0] for p in [
        (0, 10.5, 20),
        (15.5, 0, 20),
        (0, -10.5, 20),
    ]]
    fillet(f27_edges, radius=F27_R)

    # F28
    f28_edges = [f1_3.edges().sort_by_distance(p)[0] for p in [
        (16.5, 0, 20),
        (0, -11.5, 20),
        (0, 11.5, 20),
        (-16.5, 0, 20),
    ]]
    fillet(f28_edges, radius=F28_R)


solid = f1_3.part
